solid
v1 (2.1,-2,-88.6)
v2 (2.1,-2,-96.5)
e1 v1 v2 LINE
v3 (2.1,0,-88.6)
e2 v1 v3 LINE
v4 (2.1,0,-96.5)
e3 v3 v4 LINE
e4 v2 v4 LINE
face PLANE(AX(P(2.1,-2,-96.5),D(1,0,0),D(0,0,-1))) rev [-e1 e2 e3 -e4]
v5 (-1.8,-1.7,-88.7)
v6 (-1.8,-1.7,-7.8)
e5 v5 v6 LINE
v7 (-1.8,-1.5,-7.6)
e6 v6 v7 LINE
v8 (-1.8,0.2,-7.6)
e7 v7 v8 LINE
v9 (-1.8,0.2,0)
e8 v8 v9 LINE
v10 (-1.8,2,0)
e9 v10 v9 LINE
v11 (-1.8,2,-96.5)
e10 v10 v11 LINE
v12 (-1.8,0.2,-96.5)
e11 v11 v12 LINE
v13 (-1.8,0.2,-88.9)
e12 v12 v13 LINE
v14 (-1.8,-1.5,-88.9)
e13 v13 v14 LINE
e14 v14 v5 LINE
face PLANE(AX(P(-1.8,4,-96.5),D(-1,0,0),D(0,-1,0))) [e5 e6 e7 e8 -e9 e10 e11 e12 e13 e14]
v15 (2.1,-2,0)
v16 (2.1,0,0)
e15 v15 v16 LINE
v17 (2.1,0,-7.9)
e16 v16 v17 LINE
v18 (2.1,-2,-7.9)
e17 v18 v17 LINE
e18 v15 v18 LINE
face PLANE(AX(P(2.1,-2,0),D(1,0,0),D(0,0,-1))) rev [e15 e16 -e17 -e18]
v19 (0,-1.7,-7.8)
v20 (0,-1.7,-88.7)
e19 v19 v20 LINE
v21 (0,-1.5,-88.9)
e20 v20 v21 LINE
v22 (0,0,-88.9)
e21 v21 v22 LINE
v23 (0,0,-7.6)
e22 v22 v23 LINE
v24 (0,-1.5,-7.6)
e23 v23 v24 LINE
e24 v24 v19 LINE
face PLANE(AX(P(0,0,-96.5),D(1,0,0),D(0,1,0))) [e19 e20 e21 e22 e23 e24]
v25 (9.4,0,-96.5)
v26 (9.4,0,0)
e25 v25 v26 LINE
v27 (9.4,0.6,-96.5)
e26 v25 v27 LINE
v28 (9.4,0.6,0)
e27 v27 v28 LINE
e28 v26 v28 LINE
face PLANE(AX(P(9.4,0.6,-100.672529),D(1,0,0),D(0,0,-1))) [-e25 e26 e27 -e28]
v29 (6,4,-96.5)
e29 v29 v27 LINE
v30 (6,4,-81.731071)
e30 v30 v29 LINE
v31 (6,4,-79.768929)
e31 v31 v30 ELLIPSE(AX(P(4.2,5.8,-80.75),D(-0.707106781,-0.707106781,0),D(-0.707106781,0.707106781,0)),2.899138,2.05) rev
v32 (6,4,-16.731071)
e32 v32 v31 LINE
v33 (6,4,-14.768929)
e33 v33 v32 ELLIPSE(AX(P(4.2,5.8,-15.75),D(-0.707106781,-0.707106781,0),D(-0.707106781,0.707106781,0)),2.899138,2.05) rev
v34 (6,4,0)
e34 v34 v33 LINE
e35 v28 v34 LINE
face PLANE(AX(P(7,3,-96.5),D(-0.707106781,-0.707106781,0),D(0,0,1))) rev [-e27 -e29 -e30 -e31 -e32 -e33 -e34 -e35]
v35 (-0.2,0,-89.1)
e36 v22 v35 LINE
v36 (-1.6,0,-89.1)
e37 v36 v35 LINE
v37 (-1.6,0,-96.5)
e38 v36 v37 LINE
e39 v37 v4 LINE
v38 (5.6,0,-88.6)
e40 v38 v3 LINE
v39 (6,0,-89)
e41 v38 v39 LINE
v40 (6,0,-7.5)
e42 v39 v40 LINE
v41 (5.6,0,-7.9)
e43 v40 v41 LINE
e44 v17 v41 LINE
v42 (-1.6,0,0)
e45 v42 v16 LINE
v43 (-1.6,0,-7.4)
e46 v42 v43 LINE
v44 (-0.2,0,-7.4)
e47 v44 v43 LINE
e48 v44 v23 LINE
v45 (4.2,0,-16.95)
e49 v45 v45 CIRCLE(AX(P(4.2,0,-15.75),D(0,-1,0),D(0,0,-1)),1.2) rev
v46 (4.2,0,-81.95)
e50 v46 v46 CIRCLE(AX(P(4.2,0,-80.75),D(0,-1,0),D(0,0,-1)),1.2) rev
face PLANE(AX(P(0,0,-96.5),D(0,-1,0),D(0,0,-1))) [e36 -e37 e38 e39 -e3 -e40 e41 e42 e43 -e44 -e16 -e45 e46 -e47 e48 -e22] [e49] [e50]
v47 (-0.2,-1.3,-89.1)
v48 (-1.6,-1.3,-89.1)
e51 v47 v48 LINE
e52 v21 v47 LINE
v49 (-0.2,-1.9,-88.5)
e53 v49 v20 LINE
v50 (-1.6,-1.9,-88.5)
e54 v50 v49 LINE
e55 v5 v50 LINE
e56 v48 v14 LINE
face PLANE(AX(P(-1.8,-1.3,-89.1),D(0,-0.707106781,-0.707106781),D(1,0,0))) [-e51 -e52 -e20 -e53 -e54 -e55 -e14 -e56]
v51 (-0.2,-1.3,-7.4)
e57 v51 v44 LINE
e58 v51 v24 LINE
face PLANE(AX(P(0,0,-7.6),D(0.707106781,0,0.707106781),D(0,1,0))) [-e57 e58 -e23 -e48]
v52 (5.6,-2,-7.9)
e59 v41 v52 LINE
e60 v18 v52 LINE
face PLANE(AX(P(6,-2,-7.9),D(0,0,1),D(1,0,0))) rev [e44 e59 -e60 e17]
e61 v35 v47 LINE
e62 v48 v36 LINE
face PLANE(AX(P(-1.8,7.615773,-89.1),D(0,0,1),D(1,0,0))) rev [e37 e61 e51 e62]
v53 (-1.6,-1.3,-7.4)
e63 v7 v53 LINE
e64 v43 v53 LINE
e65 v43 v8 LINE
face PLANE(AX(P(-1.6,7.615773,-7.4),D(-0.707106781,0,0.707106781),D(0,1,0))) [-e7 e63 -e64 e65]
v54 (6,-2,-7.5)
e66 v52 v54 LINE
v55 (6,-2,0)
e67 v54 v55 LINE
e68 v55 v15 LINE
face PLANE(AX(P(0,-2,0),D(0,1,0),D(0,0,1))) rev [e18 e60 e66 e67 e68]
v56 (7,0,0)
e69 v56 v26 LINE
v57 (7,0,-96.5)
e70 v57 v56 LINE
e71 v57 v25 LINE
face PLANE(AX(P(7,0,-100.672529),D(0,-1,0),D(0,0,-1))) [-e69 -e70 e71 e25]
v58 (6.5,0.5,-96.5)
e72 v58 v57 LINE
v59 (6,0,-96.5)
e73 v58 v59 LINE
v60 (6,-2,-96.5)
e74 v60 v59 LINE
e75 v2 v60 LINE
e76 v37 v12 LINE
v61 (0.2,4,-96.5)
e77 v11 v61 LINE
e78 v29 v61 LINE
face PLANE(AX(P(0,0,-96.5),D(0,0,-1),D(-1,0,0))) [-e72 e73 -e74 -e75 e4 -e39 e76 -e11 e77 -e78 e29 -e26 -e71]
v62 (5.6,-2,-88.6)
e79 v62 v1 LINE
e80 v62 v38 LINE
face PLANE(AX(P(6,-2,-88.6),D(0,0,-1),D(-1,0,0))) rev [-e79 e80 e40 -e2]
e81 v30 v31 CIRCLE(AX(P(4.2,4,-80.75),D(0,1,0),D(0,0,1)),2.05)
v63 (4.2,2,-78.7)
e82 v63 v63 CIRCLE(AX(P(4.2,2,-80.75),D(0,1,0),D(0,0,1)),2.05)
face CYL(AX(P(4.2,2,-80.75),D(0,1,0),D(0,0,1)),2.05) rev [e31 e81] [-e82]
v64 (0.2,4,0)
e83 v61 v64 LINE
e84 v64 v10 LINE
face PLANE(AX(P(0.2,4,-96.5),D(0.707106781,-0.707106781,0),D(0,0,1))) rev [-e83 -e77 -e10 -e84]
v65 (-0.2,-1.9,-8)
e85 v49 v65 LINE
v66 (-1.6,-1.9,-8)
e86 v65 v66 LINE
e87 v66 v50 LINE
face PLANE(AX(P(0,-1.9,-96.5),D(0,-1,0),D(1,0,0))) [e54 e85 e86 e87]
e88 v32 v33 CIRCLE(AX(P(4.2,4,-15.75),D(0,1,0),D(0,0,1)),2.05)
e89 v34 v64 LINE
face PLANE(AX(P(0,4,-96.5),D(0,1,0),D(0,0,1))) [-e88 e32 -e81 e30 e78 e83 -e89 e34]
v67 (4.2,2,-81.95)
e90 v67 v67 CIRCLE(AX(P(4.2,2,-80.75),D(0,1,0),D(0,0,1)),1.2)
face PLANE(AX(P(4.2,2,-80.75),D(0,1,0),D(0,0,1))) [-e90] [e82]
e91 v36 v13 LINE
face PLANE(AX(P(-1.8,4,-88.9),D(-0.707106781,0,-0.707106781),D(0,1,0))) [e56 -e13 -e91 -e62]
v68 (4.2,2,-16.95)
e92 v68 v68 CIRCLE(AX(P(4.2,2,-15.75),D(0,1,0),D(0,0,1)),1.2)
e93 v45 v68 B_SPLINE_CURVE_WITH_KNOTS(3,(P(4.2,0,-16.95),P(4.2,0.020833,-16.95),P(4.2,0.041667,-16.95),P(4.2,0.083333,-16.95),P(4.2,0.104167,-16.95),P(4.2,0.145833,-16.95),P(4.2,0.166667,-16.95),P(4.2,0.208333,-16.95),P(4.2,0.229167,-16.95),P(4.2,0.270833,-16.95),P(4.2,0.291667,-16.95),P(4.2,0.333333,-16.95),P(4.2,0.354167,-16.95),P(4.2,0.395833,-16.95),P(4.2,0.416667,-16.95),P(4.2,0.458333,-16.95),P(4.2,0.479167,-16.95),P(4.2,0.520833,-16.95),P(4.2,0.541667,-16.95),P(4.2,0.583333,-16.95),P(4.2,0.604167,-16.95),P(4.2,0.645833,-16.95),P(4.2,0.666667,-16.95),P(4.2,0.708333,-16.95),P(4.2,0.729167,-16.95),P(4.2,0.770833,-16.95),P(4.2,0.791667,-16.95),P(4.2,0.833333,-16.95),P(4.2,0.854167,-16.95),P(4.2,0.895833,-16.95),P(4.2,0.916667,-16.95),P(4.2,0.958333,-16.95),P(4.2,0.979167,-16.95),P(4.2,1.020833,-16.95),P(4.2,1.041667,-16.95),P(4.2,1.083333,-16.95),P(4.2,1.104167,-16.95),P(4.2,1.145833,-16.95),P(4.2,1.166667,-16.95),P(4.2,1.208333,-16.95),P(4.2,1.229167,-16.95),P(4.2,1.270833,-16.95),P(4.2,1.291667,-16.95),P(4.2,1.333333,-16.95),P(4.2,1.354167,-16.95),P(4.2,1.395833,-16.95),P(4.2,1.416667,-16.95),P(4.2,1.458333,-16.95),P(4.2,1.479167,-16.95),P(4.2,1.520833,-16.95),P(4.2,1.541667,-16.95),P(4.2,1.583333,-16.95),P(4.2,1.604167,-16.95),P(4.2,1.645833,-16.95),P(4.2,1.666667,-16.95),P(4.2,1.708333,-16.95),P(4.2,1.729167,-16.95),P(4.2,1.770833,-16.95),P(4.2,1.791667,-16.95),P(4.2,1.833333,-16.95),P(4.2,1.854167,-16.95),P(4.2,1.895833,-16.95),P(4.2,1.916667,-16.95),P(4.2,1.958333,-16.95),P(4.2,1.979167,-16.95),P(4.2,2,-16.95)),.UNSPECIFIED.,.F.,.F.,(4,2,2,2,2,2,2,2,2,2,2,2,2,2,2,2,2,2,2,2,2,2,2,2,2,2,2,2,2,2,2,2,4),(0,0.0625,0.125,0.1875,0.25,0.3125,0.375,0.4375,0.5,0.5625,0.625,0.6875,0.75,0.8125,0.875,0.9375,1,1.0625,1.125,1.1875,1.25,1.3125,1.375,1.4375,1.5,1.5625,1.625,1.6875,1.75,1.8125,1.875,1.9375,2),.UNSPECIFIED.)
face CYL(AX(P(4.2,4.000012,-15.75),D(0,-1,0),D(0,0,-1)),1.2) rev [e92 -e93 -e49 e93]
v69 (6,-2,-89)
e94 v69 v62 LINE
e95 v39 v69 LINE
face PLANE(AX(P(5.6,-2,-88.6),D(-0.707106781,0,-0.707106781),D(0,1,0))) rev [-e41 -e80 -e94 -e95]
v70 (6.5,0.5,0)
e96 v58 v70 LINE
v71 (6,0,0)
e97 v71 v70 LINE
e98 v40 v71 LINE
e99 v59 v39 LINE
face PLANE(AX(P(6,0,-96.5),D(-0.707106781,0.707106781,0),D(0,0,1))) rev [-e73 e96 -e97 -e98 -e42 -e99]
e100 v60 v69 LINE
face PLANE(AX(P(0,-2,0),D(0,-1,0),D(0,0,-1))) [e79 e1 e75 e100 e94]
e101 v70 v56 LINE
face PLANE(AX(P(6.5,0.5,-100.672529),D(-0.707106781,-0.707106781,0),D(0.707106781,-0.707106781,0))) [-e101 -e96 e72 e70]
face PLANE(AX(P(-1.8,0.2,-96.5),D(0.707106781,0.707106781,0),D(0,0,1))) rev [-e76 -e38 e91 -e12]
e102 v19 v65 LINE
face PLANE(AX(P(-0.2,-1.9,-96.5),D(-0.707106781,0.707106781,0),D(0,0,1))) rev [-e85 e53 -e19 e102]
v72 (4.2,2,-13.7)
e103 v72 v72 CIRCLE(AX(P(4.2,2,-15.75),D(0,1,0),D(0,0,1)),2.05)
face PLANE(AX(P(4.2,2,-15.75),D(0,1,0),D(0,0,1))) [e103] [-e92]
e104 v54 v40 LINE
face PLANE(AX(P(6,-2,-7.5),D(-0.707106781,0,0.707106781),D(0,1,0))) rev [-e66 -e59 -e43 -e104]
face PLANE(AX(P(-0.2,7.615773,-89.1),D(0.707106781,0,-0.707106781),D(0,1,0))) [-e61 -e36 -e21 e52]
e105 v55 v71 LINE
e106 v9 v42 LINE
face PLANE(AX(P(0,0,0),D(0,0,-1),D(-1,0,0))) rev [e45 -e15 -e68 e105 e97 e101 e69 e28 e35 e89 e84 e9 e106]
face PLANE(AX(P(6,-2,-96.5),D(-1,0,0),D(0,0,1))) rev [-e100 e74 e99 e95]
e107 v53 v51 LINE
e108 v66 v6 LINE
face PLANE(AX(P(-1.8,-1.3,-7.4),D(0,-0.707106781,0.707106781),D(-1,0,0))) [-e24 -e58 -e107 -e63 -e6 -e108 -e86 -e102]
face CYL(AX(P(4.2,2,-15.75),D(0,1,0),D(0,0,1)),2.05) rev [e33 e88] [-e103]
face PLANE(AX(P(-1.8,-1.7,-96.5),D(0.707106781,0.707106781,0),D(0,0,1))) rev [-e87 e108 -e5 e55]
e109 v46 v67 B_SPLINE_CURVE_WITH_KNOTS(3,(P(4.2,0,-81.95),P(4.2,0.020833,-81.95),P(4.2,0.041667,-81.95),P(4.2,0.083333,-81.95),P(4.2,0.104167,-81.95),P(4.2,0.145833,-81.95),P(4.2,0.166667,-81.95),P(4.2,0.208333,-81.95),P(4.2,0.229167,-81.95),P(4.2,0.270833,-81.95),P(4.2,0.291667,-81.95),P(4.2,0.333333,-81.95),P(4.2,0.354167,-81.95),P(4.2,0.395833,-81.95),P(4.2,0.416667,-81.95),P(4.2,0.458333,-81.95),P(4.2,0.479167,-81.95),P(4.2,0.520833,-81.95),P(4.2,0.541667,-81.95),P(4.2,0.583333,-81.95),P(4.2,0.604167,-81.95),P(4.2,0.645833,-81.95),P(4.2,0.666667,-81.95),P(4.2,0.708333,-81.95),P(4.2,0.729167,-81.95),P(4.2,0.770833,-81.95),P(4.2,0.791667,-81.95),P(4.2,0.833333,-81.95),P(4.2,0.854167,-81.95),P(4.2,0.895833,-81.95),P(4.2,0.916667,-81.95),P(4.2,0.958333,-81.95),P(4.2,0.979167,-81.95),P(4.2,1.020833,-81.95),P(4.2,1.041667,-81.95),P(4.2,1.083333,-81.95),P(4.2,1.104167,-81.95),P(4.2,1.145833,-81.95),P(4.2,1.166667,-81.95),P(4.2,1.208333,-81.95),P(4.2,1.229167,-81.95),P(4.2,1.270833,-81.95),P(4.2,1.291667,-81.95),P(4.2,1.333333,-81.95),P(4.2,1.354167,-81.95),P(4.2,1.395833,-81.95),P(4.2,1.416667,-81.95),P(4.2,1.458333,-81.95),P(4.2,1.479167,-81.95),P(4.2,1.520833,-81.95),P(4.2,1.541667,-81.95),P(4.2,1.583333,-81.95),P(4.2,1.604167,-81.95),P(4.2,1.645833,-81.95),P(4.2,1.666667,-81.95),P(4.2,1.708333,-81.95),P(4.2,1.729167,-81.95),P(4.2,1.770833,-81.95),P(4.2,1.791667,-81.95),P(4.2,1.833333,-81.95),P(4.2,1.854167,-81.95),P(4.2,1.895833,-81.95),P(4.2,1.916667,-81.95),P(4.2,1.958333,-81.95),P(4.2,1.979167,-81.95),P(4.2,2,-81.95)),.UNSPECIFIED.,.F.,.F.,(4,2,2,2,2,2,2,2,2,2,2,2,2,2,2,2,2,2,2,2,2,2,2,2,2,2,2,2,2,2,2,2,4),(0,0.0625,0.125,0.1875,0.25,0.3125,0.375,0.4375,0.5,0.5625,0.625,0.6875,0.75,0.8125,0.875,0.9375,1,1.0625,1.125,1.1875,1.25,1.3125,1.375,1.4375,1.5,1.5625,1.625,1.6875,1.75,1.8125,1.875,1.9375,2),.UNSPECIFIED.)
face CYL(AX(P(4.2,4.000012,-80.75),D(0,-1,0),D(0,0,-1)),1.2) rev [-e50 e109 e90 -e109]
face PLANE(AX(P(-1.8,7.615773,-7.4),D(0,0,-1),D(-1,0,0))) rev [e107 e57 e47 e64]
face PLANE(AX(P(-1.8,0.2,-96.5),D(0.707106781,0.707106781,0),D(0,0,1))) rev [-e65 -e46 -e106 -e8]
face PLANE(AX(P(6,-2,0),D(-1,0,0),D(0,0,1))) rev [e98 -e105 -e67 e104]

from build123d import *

# Parameters (mm, degrees)
EXTRUDE_1_DEPTH          = 96.5
CHAMFER_1_SIZE           = 1
CHAMFER_2_SIZE           = 1
CUT_EXTRUDE_1_DEPTH      = 97.93327602
CUT_EXTRUDE_1_DEPTH_BACK = 10
SKETCH_2_R               = 1.2
SKETCH_2_3_R             = 2.05
CUT_EXTRUDE_2_DEPTH      = 2
CHAMFER_3_SIZE           = 2
SKETCH_3_W               = 1.8
SKETCH_3_H               = 7.4
CUT_EXTRUDE_3_DEPTH      = 1.9
CHAMFER_4_SIZE           = 0.2
CHAMFER_5_SIZE           = 0.6
SKETCH_4_W               = 3.9
SKETCH_4_H               = 7.9
EXTRUDE_2_DEPTH          = 2
CHAMFER_6_SIZE           = 0.4
EXTRUDE_3_DEPTH          = 96.5


with BuildPart() as part:
    # 草图1 → 凸台-拉伸1 (new body)
    with BuildSketch(Plane.XY):
        Polygon((0, 0), (7, 0), (7, 4), (0, 4), (-1.8, 4), (-1.8, -1.9), (0, -1.9), align=None)
    extrude(amount=-EXTRUDE_1_DEPTH)

    # 倒角1
    chamfer_1_edges = [part.edges().sort_by_distance(p)[0] for p in [
        (7, 0, -48.25),
    ]]
    chamfer(chamfer_1_edges, length=CHAMFER_1_SIZE)

    # 倒角2
    chamfer_2_edges = [part.edges().sort_by_distance(p)[0] for p in [
        (7, 4, -48.25),
    ]]
    chamfer(chamfer_2_edges, length=CHAMFER_2_SIZE)

    # 草图2 → 切除-拉伸1 (cut, two sides: drawn at the far end of the back side and taken through both)
    with BuildSketch(Plane(origin=(0, 4, 0), x_dir=(1, 0, 0), z_dir=(0, 1, 0)).offset(-CUT_EXTRUDE_1_DEPTH_BACK)):
        with Locations(Location((4.2, 80.75, 0), (0, 0, 90))):
            Circle(SKETCH_2_R)
        with Locations(Location((4.2, 15.75, 0), (0, 0, 90))):
            Circle(SKETCH_2_R)
    extrude(amount=CUT_EXTRUDE_1_DEPTH + CUT_EXTRUDE_1_DEPTH_BACK, mode=Mode.SUBTRACT)

    # 草图2<3> → 切除-拉伸2 (cut)
    with BuildSketch(Plane(origin=(0, 4, 0), x_dir=(1, 0, 0), z_dir=(0, 1, 0))):
        with Locations(Location((4.2, 80.75, 0), (0, 0, 270))):
            Circle(SKETCH_2_3_R)
        with Locations(Location((4.2, 15.75, 0), (0, 0, 270))):
            Circle(SKETCH_2_3_R)
    extrude(amount=-CUT_EXTRUDE_2_DEPTH, mode=Mode.SUBTRACT)

    # 倒角3
    chamfer_3_edges = [part.edges().sort_by_distance(p)[0] for p in [
        (-1.8, 4, -48.25),
    ]]
    chamfer(chamfer_3_edges, length=CHAMFER_3_SIZE)

    # 草图3 → 切除-拉伸3 (cut)
    with BuildSketch(Plane.XZ.offset(1.9)):
        with Locations((-0.9, -92.8)):
            Rectangle(SKETCH_3_W, SKETCH_3_H)
        with Locations((-0.9, -3.7)):
            Rectangle(SKETCH_3_W, SKETCH_3_H)
    extrude(amount=-CUT_EXTRUDE_3_DEPTH, mode=Mode.SUBTRACT)

    # 倒角4
    chamfer_4_edges = [part.edges().sort_by_distance(p)[0] for p in [
        (-1.8, -1.9, -48.25),
        (0, -1.9, -48.25),
        (-1.8, -0.95, -89.1),
        (0, -0.95, -89.1),
        (-1.8, 0, -92.8),
        (-1.8, -0.95, -7.4),
        (0, -0.95, -7.4),
        (-1.8, 0, -3.7),
    ]]
    chamfer(chamfer_4_edges, length=CHAMFER_4_SIZE)

    # 倒角5
    # the kernel refuses this chamfer: 0.6 mm, written as the material it takes off along each edge
    with BuildSketch(Plane(origin=(1.343009793, -1.9, -89.1), x_dir=(0, 0.9996219169112965, -0.027495876610595982), z_dir=(-1, 0, 0))) as chamfer_5_piece_1:
        Polygon((CHAMFER_5_SIZE * 0.999621916911, -CHAMFER_5_SIZE * 0.0274958766106), (-CHAMFER_5_SIZE * 0.0274958766106, -CHAMFER_5_SIZE * 0.999621916911), (0, 0), align=None)
    extrude(amount=4.486019586, mode=Mode.SUBTRACT)
    with BuildSketch(Plane(origin=(1.343009793, -1.9, -7.4), x_dir=(0, 0.9996219169112968, 0.027495876610585925), z_dir=(-1, 0, 0))) as chamfer_5_piece_2:
        Polygon((CHAMFER_5_SIZE * 0.999621916911, CHAMFER_5_SIZE * 0.0274958766106), (-CHAMFER_5_SIZE * 0.0274958766106, CHAMFER_5_SIZE * 0.999621916911), (0, 0), align=None)
    extrude(amount=4.486019586, mode=Mode.SUBTRACT)

    # 草图4 → 凸台-拉伸2 (add)
    with BuildSketch(Plane.XZ):
        with Locations((4.05, -92.55)):
            Rectangle(SKETCH_4_W, SKETCH_4_H)
        with Locations((4.05, -3.95)):
            Rectangle(SKETCH_4_W, SKETCH_4_H)
    extrude(amount=EXTRUDE_2_DEPTH)

    # 倒角6
    chamfer_6_edges = [part.edges().sort_by_distance(p)[0] for p in [
        (6, -1, -88.6),
        (6, -1, -7.9),
    ]]
    chamfer(chamfer_6_edges, length=CHAMFER_6_SIZE)

    # 草图5 → 凸台-拉伸3 (add)
    with BuildSketch(Plane.XY):
        Polygon((7, 3), (9.4, 0.6), (9.4, 0), (7, 0), (6.5, 0.5), (7, 1), align=None)
    extrude(amount=-EXTRUDE_3_DEPTH)


solid = part.part
